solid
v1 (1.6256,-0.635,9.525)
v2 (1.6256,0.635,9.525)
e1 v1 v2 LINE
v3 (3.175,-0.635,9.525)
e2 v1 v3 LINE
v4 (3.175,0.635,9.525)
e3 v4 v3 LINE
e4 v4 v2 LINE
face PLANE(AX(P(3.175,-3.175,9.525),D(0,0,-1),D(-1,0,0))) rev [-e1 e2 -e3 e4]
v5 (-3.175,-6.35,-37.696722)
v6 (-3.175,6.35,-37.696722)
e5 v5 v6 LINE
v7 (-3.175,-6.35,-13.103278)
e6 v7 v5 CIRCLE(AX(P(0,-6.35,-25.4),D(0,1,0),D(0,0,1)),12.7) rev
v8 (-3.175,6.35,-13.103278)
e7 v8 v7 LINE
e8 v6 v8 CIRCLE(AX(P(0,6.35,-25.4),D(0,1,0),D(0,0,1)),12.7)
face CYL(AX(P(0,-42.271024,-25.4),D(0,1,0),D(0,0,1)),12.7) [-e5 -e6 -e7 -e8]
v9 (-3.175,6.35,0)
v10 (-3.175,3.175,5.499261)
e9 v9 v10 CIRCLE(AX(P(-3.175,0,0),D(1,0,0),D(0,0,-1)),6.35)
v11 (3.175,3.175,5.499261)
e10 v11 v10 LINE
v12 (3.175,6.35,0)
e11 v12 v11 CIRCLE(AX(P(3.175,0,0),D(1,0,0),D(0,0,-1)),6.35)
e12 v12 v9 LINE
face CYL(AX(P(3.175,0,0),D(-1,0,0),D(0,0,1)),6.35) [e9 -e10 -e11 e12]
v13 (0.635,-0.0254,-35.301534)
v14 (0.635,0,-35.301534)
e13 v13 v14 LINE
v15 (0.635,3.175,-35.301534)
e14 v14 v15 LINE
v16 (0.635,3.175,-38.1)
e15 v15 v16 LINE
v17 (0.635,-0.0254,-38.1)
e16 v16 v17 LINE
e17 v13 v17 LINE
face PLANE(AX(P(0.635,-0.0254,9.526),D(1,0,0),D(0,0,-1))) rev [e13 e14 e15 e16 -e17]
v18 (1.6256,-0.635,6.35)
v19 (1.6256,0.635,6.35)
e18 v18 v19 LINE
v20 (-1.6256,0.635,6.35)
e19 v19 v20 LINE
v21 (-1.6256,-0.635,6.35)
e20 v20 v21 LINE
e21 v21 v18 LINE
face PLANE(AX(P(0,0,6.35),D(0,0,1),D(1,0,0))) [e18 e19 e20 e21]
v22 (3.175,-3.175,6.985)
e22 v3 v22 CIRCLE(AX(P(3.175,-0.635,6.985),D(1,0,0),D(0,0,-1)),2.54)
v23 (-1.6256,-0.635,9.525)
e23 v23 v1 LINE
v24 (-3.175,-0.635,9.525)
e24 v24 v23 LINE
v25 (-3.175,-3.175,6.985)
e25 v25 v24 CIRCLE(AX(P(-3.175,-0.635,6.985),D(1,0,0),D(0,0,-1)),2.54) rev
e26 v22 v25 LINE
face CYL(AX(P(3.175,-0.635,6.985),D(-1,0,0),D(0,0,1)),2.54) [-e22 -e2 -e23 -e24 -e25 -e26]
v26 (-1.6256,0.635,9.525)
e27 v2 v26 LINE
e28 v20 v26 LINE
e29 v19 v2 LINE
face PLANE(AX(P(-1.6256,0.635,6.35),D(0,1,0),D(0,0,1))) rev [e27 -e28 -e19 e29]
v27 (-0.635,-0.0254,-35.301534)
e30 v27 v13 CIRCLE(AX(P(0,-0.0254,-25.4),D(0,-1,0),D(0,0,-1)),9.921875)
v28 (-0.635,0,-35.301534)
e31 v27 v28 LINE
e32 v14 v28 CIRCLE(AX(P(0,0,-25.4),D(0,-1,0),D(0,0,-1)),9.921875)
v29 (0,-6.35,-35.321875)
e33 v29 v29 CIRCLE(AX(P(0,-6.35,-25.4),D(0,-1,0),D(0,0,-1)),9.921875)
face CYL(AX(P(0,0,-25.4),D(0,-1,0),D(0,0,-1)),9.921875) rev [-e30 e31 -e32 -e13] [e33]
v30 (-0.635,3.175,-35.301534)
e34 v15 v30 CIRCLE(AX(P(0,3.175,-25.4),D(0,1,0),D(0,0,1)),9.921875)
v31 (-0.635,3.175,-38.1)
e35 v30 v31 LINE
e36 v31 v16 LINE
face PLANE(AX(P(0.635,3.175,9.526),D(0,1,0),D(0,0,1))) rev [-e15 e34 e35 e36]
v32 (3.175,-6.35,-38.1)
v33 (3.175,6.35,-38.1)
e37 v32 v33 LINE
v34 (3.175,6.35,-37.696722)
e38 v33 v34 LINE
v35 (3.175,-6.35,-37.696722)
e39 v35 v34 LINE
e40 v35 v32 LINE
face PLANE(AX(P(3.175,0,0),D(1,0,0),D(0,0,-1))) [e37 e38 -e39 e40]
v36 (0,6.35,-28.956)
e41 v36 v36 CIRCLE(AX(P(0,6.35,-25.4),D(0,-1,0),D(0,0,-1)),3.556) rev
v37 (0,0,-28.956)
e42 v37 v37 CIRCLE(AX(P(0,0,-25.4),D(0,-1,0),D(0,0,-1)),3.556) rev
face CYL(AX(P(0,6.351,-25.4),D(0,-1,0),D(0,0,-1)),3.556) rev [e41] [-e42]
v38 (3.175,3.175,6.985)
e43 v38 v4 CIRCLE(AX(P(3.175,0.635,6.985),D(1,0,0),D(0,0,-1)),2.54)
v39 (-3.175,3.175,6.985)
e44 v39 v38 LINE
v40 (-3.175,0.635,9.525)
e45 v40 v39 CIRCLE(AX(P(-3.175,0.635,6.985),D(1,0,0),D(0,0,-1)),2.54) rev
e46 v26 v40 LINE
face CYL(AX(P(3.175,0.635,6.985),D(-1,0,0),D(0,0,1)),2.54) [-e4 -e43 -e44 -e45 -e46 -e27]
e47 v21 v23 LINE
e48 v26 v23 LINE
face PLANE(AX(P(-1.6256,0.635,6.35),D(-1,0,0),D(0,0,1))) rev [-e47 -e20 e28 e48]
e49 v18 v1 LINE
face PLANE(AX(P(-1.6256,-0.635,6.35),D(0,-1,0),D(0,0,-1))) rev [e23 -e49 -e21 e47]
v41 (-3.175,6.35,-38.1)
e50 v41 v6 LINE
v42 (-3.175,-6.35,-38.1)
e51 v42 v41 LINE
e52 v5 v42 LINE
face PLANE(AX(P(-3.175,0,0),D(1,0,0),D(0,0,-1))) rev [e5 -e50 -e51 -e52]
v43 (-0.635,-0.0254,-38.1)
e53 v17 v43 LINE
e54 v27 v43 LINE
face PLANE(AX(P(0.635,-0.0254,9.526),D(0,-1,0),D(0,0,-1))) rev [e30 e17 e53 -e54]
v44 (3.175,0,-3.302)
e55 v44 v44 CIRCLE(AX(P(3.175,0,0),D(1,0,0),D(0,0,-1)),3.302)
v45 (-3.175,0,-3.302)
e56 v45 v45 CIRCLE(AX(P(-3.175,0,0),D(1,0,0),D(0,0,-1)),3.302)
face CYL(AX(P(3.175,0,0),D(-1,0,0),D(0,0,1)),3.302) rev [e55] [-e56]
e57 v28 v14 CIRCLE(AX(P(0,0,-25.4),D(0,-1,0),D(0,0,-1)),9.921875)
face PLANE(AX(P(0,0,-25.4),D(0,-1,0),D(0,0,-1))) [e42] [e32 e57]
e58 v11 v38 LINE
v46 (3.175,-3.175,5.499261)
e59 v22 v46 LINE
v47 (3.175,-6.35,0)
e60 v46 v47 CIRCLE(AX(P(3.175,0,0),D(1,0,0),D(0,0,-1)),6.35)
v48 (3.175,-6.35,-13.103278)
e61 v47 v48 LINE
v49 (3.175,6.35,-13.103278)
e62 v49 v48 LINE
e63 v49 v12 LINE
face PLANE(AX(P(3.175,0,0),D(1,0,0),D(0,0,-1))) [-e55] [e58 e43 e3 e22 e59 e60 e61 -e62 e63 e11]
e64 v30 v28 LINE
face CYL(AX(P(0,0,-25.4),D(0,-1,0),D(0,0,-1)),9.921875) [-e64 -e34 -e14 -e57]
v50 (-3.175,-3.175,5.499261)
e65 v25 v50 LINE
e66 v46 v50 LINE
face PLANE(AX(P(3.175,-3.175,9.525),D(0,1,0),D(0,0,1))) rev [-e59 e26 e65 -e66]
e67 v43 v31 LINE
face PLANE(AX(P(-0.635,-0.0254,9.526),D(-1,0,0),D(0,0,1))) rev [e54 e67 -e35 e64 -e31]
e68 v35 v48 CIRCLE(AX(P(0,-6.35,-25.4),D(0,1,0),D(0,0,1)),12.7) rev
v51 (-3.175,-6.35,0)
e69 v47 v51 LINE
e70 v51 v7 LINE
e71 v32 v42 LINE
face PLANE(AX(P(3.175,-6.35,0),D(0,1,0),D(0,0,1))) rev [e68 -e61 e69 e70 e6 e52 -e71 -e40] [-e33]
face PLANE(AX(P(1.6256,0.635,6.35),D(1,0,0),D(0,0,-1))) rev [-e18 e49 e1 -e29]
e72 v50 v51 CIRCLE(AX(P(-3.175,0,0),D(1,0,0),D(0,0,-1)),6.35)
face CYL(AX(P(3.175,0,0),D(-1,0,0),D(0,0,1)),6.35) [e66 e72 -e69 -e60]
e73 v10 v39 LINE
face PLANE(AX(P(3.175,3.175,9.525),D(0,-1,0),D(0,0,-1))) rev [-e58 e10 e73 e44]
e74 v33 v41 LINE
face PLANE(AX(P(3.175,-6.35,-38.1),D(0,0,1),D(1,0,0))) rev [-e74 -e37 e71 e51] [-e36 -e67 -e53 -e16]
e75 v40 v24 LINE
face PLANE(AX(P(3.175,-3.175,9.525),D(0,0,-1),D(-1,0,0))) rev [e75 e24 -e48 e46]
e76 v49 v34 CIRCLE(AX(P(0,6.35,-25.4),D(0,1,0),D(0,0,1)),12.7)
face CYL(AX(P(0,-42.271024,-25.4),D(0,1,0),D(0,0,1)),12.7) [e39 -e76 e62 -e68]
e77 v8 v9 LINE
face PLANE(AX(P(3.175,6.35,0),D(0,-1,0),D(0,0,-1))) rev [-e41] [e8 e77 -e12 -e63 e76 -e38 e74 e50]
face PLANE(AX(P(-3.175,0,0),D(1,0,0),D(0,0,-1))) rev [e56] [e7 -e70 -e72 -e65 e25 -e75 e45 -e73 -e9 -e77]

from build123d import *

# Parameters (mm, degrees)
SKETCH1_R               = 3.302
BOSS_EXTRUDE1_DEPTH     = 3.175
SKETCH2_R               = 12.7
BOSS_EXTRUDE2_DEPTH     = 12.7
CUT_EXTRUDE1_REACH      = 44.121
SKETCH3_R               = 3.556
SKETCH4_R               = 9.921875
CUT_EXTRUDE2_DEPTH      = 6.35
CUT_EXTRUDE3_REACH      = 51.697
CUT_EXTRUDE3_END_RADIUS = 9.921875
SKETCH5_W               = 1.27
SKETCH5_H               = 3.2004
SKETCH6_W               = 3.2512
SKETCH6_H               = 1.27
CUT_EXTRUDE4_DEPTH      = 3.175
FILLET2_R               = 2.54


with BuildPart() as part:
    # Sketch1 → Boss-Extrude1 (new, symmetric)
    with BuildSketch(Plane(origin=(0, 0, 0), x_dir=(0, 0, -1), z_dir=(1, 0, 0))):
        with BuildLine():
            Line((0, -6.35), (38.1, -6.35))
            Line((38.1, -6.35), (38.1, 6.35))
            Line((38.1, 6.35), (0, 6.35))
            ThreePointArc((0, 6.35), (-3.175, 5.499261314), (-5.499261314, 3.175))
            Line((-5.499261314, 3.175), (-9.525, 3.175))
            Line((-9.525, 3.175), (-9.525, -3.175))
            Line((-9.525, -3.175), (-5.499261314, -3.175))
            ThreePointArc((-5.499261314, -3.175), (-3.175, -5.499261314), (0, -6.35))
        make_face()
        Circle(SKETCH1_R, mode=Mode.SUBTRACT)
    extrude(amount=BOSS_EXTRUDE1_DEPTH, both=True)

    # Sketch2 → Boss-Extrude2 (add)
    with BuildSketch(Plane(origin=(0, 6.35, 0), x_dir=(1, 0, 0), z_dir=(0, 1, 0))):
        with Locations((0, 25.4)):
            Circle(SKETCH2_R)
    extrude(amount=-BOSS_EXTRUDE2_DEPTH)

    # Sketch3 → Cut-Extrude1 (cut, up to next)
    with BuildSketch(Plane.XZ.offset(6.35), mode=Mode.PRIVATE) as cut_extrude1_sk1:
        with Locations(Location((0, -25.4, 0), (0, 0, 270))):
            Circle(SKETCH3_R)
    cut_extrude1_tool1 = extrude(cut_extrude1_sk1.sketch, amount=-CUT_EXTRUDE1_REACH, mode=Mode.PRIVATE) & part.part
    add(cut_extrude1_tool1.solids().sort_by_distance((0, -6.35, -25.4))[0], mode=Mode.SUBTRACT)

    # Sketch4 → Cut-Extrude2 (cut)
    with BuildSketch(Plane.XZ.offset(6.35)):
        with Locations(Location((0, -25.4, 0), (0, 0, 270))):
            Circle(SKETCH4_R)
    extrude(amount=-CUT_EXTRUDE2_DEPTH, mode=Mode.SUBTRACT)

    # Cut-Extrude3: up to this cylinder (the profile starts outside it)
    cut_extrude3_end = Plane(origin=(0, 1.5748, -25.4), z_dir=(0, -1, 0)) * Cylinder(CUT_EXTRUDE3_END_RADIUS, 124.23775, mode=Mode.PRIVATE)
    # Sketch5 → Cut-Extrude3 (cut, up to the surface)
    with BuildSketch(Plane(origin=(0, 0, -38.1), x_dir=(-1, 0, 0), z_dir=(0, 0, -1)), mode=Mode.PRIVATE) as cut_extrude3_sk1:
        with Locations((0, 1.5748)):
            Rectangle(SKETCH5_W, SKETCH5_H)
    cut_extrude3_tool1 = extrude(cut_extrude3_sk1.sketch, amount=-CUT_EXTRUDE3_REACH, mode=Mode.PRIVATE) - cut_extrude3_end
    add(cut_extrude3_tool1.solids().sort_by_distance((0, 1.5748, -38.1))[0], mode=Mode.SUBTRACT)

    # Sketch6 → Cut-Extrude4 (cut)
    with BuildSketch(Plane.XY.offset(9.525)):
        Rectangle(SKETCH6_W, SKETCH6_H)
    extrude(amount=-CUT_EXTRUDE4_DEPTH, mode=Mode.SUBTRACT)

    # Fillet2
    fillet2_edges = [part.edges().sort_by_distance(p)[0] for p in [
        (0, -3.175, 9.525),
        (0, 3.175, 9.525),
    ]]
    fillet(fillet2_edges, radius=FILLET2_R - 0.0001)  # a hair under: the kernel refuses the full size


solid = part.part
